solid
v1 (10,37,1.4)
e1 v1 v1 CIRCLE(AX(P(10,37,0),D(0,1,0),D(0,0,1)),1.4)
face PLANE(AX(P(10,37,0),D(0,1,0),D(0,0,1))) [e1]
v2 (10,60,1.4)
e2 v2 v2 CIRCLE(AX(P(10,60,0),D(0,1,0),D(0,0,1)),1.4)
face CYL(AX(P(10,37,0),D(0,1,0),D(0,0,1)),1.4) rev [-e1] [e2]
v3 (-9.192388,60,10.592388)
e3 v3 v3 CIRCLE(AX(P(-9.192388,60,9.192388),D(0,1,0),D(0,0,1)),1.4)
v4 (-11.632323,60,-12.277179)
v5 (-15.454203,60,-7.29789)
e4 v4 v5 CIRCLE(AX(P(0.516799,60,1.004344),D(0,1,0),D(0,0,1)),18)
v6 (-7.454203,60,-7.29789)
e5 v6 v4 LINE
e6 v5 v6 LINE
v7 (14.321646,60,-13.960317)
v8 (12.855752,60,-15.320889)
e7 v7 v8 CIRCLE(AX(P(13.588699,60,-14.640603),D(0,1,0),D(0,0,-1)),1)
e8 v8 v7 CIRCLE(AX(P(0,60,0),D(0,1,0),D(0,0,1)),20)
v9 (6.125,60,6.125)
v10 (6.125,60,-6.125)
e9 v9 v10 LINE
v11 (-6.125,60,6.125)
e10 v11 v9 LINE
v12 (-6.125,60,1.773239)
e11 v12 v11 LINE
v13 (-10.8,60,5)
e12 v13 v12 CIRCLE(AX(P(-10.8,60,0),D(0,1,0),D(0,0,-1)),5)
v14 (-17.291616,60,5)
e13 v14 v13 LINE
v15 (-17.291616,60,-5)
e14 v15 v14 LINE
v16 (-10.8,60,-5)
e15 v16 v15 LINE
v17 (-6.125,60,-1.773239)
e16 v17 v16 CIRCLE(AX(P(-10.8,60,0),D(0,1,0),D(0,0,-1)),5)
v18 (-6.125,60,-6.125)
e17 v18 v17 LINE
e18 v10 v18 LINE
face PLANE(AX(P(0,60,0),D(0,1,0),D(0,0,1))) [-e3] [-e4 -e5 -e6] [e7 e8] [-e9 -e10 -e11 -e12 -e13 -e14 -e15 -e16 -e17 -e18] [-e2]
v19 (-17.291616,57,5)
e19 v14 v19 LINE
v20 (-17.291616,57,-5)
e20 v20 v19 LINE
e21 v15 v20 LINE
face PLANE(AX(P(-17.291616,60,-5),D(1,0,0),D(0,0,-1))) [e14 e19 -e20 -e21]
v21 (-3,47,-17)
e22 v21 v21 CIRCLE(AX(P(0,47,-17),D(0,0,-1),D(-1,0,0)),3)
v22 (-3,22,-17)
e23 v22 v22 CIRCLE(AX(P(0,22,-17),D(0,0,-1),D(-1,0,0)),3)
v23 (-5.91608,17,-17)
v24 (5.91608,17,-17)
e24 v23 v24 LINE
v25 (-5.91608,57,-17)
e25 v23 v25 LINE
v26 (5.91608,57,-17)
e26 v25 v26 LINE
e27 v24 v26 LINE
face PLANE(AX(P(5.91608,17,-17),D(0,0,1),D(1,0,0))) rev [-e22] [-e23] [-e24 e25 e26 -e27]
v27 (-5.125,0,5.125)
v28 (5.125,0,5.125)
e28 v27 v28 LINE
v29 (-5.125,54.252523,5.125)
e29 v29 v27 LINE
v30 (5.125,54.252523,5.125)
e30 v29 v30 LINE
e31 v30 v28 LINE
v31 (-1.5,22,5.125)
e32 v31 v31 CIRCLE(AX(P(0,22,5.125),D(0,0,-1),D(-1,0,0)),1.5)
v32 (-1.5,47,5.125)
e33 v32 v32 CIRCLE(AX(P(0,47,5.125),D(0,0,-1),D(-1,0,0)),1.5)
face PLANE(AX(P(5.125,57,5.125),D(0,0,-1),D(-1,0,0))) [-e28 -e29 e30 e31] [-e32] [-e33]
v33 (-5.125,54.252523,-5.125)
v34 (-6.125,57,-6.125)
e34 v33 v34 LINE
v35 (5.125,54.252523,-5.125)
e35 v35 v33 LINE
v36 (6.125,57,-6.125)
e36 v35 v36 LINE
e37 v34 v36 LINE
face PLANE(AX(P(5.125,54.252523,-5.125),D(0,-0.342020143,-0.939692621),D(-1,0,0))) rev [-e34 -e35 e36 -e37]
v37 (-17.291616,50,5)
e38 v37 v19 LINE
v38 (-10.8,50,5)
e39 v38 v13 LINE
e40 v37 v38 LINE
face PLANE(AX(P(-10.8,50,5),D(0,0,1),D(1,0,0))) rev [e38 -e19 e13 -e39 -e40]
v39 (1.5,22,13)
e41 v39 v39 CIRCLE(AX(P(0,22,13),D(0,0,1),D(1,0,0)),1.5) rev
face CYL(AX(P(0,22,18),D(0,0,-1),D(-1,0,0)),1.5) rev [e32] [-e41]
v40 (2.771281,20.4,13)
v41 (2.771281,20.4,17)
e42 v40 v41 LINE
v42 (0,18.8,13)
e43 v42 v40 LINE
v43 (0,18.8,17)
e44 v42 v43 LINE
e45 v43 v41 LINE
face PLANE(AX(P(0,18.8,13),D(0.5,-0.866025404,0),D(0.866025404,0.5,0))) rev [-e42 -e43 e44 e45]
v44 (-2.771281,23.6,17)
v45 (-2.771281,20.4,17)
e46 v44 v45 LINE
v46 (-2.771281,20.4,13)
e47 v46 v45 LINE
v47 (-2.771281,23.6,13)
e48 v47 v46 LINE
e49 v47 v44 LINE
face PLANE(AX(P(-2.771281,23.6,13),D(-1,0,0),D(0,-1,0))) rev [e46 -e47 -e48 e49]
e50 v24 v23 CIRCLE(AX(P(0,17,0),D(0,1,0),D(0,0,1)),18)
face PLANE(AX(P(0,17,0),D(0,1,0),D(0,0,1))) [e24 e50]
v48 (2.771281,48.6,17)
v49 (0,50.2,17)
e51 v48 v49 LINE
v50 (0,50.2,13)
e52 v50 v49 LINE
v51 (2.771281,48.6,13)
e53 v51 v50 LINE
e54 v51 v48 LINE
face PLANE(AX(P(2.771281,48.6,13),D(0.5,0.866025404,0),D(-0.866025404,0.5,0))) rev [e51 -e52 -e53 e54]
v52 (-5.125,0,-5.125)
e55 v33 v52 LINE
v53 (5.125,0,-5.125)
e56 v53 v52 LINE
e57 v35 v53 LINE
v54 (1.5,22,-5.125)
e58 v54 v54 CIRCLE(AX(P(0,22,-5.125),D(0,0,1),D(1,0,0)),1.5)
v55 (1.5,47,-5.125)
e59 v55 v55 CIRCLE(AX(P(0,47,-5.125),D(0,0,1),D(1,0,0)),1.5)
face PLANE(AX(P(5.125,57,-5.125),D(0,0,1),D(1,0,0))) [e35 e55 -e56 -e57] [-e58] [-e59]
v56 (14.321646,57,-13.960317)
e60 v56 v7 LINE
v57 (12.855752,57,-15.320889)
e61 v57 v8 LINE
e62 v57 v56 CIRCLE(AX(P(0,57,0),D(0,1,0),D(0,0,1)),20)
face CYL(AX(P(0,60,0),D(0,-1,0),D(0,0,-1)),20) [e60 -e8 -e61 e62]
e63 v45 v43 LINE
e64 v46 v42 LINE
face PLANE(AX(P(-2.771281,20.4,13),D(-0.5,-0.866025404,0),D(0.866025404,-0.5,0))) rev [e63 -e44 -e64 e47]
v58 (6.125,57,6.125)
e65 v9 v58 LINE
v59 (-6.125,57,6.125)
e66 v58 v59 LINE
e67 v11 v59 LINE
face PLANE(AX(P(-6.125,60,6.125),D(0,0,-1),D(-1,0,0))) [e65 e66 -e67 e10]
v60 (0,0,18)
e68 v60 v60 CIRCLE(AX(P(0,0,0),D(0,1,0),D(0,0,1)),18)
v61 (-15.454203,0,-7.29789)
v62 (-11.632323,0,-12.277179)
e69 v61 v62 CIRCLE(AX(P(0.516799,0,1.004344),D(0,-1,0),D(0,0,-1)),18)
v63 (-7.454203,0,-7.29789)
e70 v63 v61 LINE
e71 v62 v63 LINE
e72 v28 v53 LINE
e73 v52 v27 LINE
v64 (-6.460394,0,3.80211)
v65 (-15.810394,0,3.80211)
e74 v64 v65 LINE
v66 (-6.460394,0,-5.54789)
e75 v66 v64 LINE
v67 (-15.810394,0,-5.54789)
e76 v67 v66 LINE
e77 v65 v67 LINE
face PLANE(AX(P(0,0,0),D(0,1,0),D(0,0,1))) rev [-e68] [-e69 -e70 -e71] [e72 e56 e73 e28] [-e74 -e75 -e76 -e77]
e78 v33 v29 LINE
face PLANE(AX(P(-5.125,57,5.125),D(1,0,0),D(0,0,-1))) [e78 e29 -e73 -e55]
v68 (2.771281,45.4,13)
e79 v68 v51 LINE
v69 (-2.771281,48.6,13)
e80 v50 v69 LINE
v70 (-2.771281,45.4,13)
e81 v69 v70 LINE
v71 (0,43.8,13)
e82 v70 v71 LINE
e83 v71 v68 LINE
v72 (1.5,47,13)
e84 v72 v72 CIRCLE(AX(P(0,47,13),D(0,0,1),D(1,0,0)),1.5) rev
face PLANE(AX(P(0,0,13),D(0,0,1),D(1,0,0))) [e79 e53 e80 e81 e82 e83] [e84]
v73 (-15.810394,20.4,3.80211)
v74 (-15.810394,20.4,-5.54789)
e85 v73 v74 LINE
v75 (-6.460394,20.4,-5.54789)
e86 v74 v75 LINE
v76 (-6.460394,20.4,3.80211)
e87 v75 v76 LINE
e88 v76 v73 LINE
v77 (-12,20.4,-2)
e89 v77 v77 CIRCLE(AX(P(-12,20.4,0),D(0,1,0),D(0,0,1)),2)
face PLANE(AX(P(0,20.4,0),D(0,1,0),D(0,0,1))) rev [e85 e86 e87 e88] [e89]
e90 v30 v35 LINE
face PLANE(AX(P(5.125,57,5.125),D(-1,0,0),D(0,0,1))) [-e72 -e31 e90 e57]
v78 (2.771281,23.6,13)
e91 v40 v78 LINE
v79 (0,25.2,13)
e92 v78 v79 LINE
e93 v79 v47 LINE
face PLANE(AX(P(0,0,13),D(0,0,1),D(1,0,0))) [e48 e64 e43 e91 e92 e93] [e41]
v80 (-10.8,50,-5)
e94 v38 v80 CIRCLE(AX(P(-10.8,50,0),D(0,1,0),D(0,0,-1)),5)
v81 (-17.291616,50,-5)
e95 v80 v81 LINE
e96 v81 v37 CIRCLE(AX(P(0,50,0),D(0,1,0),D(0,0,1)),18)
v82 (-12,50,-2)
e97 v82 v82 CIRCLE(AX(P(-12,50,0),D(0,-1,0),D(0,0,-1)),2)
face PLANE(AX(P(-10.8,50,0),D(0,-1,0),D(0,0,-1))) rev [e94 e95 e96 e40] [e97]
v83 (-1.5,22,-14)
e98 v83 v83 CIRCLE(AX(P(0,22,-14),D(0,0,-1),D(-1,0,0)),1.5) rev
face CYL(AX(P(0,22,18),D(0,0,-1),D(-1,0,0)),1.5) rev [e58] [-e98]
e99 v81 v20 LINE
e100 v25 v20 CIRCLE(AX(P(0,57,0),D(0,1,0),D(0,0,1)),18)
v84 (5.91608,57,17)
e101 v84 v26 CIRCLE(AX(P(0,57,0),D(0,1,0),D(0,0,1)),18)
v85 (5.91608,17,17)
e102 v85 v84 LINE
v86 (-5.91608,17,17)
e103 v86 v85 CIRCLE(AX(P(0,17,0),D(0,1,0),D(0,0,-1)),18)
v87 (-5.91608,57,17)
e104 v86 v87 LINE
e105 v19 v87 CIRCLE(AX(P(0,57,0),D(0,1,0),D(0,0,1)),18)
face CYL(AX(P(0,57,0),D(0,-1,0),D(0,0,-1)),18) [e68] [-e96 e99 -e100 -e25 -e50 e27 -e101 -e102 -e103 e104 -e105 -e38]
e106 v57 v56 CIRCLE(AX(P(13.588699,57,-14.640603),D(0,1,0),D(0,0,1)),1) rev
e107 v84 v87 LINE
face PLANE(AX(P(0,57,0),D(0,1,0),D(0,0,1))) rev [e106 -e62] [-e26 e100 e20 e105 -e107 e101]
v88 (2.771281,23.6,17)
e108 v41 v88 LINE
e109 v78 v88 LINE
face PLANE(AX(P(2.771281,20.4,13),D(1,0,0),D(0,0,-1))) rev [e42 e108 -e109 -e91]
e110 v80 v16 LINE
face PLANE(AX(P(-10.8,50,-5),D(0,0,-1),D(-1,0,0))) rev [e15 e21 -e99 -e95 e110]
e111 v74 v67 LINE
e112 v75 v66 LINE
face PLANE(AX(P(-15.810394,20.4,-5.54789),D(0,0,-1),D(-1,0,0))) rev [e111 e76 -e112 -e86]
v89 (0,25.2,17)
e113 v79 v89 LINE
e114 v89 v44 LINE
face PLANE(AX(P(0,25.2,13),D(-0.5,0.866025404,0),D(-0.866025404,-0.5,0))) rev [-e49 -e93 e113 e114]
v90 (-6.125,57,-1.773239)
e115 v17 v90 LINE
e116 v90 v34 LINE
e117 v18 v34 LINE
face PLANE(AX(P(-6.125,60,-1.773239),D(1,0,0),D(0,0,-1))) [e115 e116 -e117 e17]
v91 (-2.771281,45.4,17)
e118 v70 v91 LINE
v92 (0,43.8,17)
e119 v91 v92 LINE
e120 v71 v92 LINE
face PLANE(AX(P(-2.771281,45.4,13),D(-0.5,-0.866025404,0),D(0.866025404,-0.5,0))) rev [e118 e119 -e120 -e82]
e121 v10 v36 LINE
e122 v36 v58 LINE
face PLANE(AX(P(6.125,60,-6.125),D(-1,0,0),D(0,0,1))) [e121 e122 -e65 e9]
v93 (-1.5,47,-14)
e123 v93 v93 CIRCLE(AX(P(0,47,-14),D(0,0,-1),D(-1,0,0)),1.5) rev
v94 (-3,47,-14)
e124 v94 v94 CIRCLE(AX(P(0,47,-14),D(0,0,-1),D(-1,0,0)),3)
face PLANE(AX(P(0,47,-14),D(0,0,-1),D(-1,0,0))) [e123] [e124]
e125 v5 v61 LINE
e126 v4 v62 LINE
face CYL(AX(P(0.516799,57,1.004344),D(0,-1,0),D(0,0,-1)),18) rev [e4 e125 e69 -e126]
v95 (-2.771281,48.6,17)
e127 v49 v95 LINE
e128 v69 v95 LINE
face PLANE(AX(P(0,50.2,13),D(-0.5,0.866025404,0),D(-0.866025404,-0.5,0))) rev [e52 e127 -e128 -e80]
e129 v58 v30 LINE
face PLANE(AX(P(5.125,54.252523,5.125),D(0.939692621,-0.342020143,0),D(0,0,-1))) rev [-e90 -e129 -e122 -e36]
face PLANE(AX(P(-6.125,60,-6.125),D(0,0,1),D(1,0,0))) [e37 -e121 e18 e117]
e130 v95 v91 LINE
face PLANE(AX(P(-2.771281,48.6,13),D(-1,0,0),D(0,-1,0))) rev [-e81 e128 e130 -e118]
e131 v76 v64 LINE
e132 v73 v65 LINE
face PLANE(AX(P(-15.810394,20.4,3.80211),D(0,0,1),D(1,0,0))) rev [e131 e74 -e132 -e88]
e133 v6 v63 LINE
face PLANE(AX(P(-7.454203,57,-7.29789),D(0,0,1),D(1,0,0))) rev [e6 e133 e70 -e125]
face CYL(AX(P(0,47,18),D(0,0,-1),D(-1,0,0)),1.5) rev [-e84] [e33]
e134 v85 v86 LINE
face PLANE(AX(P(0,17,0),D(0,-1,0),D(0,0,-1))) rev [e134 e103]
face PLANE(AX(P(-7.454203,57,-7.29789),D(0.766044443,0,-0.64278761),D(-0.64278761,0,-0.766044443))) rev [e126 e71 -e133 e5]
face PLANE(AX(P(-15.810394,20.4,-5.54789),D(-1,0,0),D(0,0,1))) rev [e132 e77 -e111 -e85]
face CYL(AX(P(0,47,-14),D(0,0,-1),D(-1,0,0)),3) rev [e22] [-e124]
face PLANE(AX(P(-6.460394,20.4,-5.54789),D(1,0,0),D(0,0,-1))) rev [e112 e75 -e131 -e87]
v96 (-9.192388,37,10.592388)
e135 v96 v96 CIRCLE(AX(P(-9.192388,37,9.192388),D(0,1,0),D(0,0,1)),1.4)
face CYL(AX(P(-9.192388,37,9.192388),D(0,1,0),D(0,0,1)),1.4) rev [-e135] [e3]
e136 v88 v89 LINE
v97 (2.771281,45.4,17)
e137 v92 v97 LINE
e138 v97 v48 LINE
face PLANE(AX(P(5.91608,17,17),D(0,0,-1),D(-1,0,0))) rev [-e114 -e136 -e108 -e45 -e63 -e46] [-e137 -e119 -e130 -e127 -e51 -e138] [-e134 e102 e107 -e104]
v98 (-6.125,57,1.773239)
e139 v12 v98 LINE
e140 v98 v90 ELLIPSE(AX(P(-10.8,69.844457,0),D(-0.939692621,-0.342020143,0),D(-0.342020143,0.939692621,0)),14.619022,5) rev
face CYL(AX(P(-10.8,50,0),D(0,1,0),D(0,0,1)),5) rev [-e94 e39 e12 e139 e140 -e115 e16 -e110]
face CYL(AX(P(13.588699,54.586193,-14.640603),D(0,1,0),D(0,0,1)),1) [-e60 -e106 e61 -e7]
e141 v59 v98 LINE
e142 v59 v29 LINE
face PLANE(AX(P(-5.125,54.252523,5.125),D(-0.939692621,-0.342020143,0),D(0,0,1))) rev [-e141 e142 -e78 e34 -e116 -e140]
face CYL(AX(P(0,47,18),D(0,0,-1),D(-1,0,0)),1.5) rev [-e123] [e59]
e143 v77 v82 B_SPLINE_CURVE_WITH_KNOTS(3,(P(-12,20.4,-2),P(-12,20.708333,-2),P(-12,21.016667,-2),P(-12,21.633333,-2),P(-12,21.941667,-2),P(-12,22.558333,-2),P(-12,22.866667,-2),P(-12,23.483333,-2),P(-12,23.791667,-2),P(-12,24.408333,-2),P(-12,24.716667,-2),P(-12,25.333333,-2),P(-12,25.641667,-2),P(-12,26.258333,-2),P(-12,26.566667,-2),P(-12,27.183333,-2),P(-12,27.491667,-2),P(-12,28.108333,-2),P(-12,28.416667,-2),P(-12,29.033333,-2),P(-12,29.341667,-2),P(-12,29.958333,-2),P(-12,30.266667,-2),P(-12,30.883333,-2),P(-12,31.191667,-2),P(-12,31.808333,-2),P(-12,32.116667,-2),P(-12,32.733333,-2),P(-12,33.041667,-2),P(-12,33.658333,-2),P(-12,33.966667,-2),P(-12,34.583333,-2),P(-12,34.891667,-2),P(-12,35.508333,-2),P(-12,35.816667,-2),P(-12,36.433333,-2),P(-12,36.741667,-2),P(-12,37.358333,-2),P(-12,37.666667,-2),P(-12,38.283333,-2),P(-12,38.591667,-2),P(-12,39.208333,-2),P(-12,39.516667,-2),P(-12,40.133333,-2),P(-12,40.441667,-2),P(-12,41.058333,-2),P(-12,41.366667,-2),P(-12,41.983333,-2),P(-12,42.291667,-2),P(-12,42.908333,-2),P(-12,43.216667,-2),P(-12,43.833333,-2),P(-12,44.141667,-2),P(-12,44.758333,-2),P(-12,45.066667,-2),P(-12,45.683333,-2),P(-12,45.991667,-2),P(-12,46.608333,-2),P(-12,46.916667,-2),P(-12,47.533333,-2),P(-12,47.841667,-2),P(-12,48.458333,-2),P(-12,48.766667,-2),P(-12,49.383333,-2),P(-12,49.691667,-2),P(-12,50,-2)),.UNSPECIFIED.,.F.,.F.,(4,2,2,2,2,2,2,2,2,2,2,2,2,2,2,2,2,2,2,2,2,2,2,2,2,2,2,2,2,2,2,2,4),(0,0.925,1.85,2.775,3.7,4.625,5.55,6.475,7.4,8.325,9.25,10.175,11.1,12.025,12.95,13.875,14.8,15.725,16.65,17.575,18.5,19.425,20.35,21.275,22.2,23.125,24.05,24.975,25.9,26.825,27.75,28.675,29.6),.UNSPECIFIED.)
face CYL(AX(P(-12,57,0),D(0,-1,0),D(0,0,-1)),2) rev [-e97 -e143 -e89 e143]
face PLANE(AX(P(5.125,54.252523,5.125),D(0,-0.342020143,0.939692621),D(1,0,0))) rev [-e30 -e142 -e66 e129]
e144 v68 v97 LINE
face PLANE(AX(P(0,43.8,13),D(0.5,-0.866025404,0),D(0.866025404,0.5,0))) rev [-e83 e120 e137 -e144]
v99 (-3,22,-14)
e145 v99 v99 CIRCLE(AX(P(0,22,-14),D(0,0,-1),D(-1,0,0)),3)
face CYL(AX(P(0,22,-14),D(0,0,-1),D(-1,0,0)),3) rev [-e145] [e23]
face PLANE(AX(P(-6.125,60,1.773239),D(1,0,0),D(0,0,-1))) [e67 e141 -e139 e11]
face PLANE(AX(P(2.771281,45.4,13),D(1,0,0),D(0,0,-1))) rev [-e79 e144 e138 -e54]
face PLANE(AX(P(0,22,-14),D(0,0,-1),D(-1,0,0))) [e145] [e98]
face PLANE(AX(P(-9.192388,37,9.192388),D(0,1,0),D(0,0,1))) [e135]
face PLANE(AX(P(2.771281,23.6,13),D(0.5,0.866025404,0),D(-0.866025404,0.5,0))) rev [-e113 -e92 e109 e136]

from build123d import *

# Parameters (mm, degrees)
SKETCH1_R           = 18
SKETCH1_R_2         = 2
SKETCH1_W           = 10.25
SKETCH1_H           = 10.25
BOSS_EXTRUDE1_DEPTH = 57
CUT_EXTRUDE1_START  = -7
CUT_EXTRUDE1_DEPTH  = 7
SKETCH4_W           = 9.35
SKETCH4_H           = 9.35
CUT_EXTRUDE3_DEPTH  = 20.4
CUT_EXTRUDE4_START  = -40
CUT_EXTRUDE4_DEPTH  = 40
SKETCH6_R           = 1.5
CUT_EXTRUDE5_DEPTH  = 70.267597042
SKETCH7_R           = 3
CUT_EXTRUDE6_DEPTH  = 3
CUT_EXTRUDE7_DEPTH  = 4
CHAMFER1_SIZE       = 1
CHAMFER1_SIZE_2     = 2.747477419
CUT_EXTRUDE8_DEPTH  = 63.42595614
SKETCH12_R          = 1.4
CUT_EXTRUDE10_DEPTH = 20
SKETCH13_R          = 20
SKETCH13_R_2        = 1.4
BOSS_EXTRUDE2_DEPTH = 3
BOSS_EXTRUDE3_DEPTH = 3


with BuildPart() as part:
    # Sketch1 → Boss-Extrude1 (new body)
    with BuildSketch(Plane(origin=(0, 0, 0), x_dir=(1, 0, 0), z_dir=(0, 1, 0))):
        with Locations(Location((0, 0, 0), (0, 0, 90))):
            Circle(SKETCH1_R)
        with Locations(Location((-12, 0, 0), (0, 0, 90))):
            Circle(SKETCH1_R_2, mode=Mode.SUBTRACT)
        Rectangle(SKETCH1_W, SKETCH1_H, mode=Mode.SUBTRACT)
    extrude(amount=BOSS_EXTRUDE1_DEPTH)

    # Sketch2 → Cut-Extrude1 (cut)
    with BuildSketch(Plane(origin=(0, 57, 0), x_dir=(1, 0, 0), z_dir=(0, 1, 0)).offset(CUT_EXTRUDE1_START)):
        with BuildLine():
            Line((-10.8, 5), (-17.291616466, 5))
            ThreePointArc((-17.291616466, 5), (-18, 0), (-17.291616466, -5))
            Line((-17.291616466, -5), (-10.8, -5))
            ThreePointArc((-10.8, -5), (-5.8, 0), (-10.8, 5))
        make_face()
    extrude(amount=CUT_EXTRUDE1_DEPTH, mode=Mode.SUBTRACT)

    # Sketch4 → Cut-Extrude3 (cut)
    with BuildSketch(Plane(origin=(0, 0, 0), x_dir=(-1, 0, 0), z_dir=(0, -1, 0))):
        with Locations((11.135393506, 0.872889968)):
            Rectangle(SKETCH4_W, SKETCH4_H)
    extrude(amount=-CUT_EXTRUDE3_DEPTH, mode=Mode.SUBTRACT)

    # Sketch5 → Cut-Extrude4 (cut)
    with BuildSketch(Plane(origin=(0, 57, 0), x_dir=(1, 0, 0), z_dir=(0, 1, 0)).offset(CUT_EXTRUDE4_START)):
        with BuildLine():
            Line((5.916079783, 17), (-5.916079783, 17))
            ThreePointArc((-5.916079783, 17), (0, 18), (5.916079783, 17))
        make_face()
        with BuildLine():
            Line((5.916079783, -17), (-5.916079783, -17))
            ThreePointArc((-5.916079783, -17), (0, -18), (5.916079783, -17))
        make_face()
    extrude(amount=CUT_EXTRUDE4_DEPTH, mode=Mode.SUBTRACT)

    # Sketch6 → Cut-Extrude5 (cut, through all)
    with BuildSketch(Plane(origin=(0, 0, -17), x_dir=(-1, 0, 0), z_dir=(0, 0, -1))):
        with Locations((0, 47)):
            Circle(SKETCH6_R)
        with Locations((0, 22)):
            Circle(SKETCH6_R)
    extrude(amount=-CUT_EXTRUDE5_DEPTH, mode=Mode.SUBTRACT)

    # Sketch7 → Cut-Extrude6 (cut)
    with BuildSketch(Plane(origin=(0, 0, -17), x_dir=(-1, 0, 0), z_dir=(0, 0, -1))):
        with Locations((0, 47)):
            Circle(SKETCH7_R)
        with Locations((0, 22)):
            Circle(SKETCH7_R)
    extrude(amount=-CUT_EXTRUDE6_DEPTH, mode=Mode.SUBTRACT)

    # Sketch8 → Cut-Extrude7 (cut)
    with BuildSketch(Plane.XY.offset(17)):
        Polygon((0, 43.8), (2.771281292, 45.4), (2.771281292, 48.6), (0, 50.2), (-2.771281292, 48.6), (-2.771281292, 45.4), align=None)
        Polygon((0, 18.8), (2.771281292, 20.4), (2.771281292, 23.6), (0, 25.2), (-2.771281292, 23.6), (-2.771281292, 20.4), align=None)
    extrude(amount=-CUT_EXTRUDE7_DEPTH, mode=Mode.SUBTRACT)

    # Chamfer1
    # the kernel refuses this chamfer: 2.747477419, 1 mm, written as the material it takes off along each edge
    with BuildSketch(Plane(origin=(-5.125, 57, -5.125), x_dir=(0, 0.09904090225204956, -0.9950833631817488), z_dir=(1, 0, 0)), Plane(origin=(-5.125, 57, 5.125), x_dir=(-0.9950833631817488, 0.09904090225204956, 0), z_dir=(0, 0, -1)), Plane(origin=(5.125, 57, 5.125), x_dir=(0, 0.09904090225204956, 0.9950833631817488), z_dir=(-1, 0, 0)), Plane(origin=(5.125, 57, -5.125), x_dir=(0.9950833631817488, 0.09904090225204956, 0), z_dir=(0, 0, 1))) as chamfer1_piece_1:
        Polygon((CHAMFER1_SIZE * 0.995083363182, -CHAMFER1_SIZE * 0.099040902252), (-CHAMFER1_SIZE_2 * 0.0990409022684, -CHAMFER1_SIZE_2 * 0.995083363346), (0, 0), align=None)
    extrude(amount=10.25, mode=Mode.SUBTRACT)
    with BuildSketch(Plane(origin=(-5.125, 57, 5.125), x_dir=(-0.9950833631817488, 0.09904090225204956, 0), z_dir=(0, 0, -1))) as chamfer1_piece_2a_section:
        Polygon((CHAMFER1_SIZE * 0.995083363182, -CHAMFER1_SIZE * 0.099040902252), (-CHAMFER1_SIZE_2 * 0.0990409022684, -CHAMFER1_SIZE_2 * 0.995083363346), (0, 0), align=None)
    chamfer1_piece_2a = extrude(amount=17.377491449, mode=Mode.PRIVATE)
    chamfer1_piece_2a = split(chamfer1_piece_2a, bisect_by=Plane(origin=(-5.432505006, 56.059901151, -5.125), z_dir=(0, 0, -1)), keep=Keep.TOP, mode=Mode.PRIVATE)
    with BuildSketch(Plane(origin=(-12.252491449, 57, -5.125), x_dir=(0, 0.09904090225204956, -0.9950833631817488), z_dir=(1, 0, 0))) as chamfer1_piece_2b_section:
        Polygon((CHAMFER1_SIZE * 0.995083363182, -CHAMFER1_SIZE * 0.099040902252), (-CHAMFER1_SIZE_2 * 0.0990409022684, -CHAMFER1_SIZE_2 * 0.995083363346), (0, 0), align=None)
    chamfer1_piece_2b = extrude(amount=17.377491449, mode=Mode.PRIVATE)
    chamfer1_piece_2b = split(chamfer1_piece_2b, bisect_by=Plane(origin=(-5.125, 56.059901151, -5.432505006), z_dir=(-1, 0, 0)), keep=Keep.TOP, mode=Mode.PRIVATE)
    chamfer1_piece_2 = chamfer1_piece_2a & chamfer1_piece_2b
    add(chamfer1_piece_2, mode=Mode.SUBTRACT)
    with BuildSketch(Plane(origin=(5.125, 57, -12.252491449), x_dir=(0.9950833631817488, 0.09904090225204956, 0), z_dir=(0, 0, 1))) as chamfer1_piece_3a_section:
        Polygon((CHAMFER1_SIZE * 0.995083363182, -CHAMFER1_SIZE * 0.099040902252), (-CHAMFER1_SIZE_2 * 0.0990409022684, -CHAMFER1_SIZE_2 * 0.995083363346), (0, 0), align=None)
    chamfer1_piece_3a = extrude(amount=17.377491449, mode=Mode.PRIVATE)
    chamfer1_piece_3a = split(chamfer1_piece_3a, bisect_by=Plane(origin=(5.432505006, 56.059901151, -5.125), z_dir=(0, 0, -1)), keep=Keep.TOP, mode=Mode.PRIVATE)
    with BuildSketch(Plane(origin=(-5.125, 57, -5.125), x_dir=(0, 0.09904090225204956, -0.9950833631817488), z_dir=(1, 0, 0))) as chamfer1_piece_3b_section:
        Polygon((CHAMFER1_SIZE * 0.995083363182, -CHAMFER1_SIZE * 0.099040902252), (-CHAMFER1_SIZE_2 * 0.0990409022684, -CHAMFER1_SIZE_2 * 0.995083363346), (0, 0), align=None)
    chamfer1_piece_3b = extrude(amount=17.377491449, mode=Mode.PRIVATE)
    chamfer1_piece_3b = split(chamfer1_piece_3b, bisect_by=Plane(origin=(5.125, 56.059901151, -5.432505006), z_dir=(1, 0, 0)), keep=Keep.TOP, mode=Mode.PRIVATE)
    chamfer1_piece_3 = chamfer1_piece_3a & chamfer1_piece_3b
    add(chamfer1_piece_3, mode=Mode.SUBTRACT)
    with BuildSketch(Plane(origin=(5.125, 57, 5.125), x_dir=(0, 0.09904090225204956, 0.9950833631817488), z_dir=(-1, 0, 0))) as chamfer1_piece_4a_section:
        Polygon((CHAMFER1_SIZE * 0.995083363182, -CHAMFER1_SIZE * 0.099040902252), (-CHAMFER1_SIZE_2 * 0.0990409022684, -CHAMFER1_SIZE_2 * 0.995083363346), (0, 0), align=None)
    chamfer1_piece_4a = extrude(amount=17.377491449, mode=Mode.PRIVATE)
    chamfer1_piece_4a = split(chamfer1_piece_4a, bisect_by=Plane(origin=(-5.125, 56.059901151, 5.432505006), z_dir=(-1, 0, 0)), keep=Keep.TOP, mode=Mode.PRIVATE)
    with BuildSketch(Plane(origin=(-5.125, 57, 12.252491449), x_dir=(-0.9950833631817488, 0.09904090225204956, 0), z_dir=(0, 0, -1))) as chamfer1_piece_4b_section:
        Polygon((CHAMFER1_SIZE * 0.995083363182, -CHAMFER1_SIZE * 0.099040902252), (-CHAMFER1_SIZE_2 * 0.0990409022684, -CHAMFER1_SIZE_2 * 0.995083363346), (0, 0), align=None)
    chamfer1_piece_4b = extrude(amount=17.377491449, mode=Mode.PRIVATE)
    chamfer1_piece_4b = split(chamfer1_piece_4b, bisect_by=Plane(origin=(-5.432505006, 56.059901151, 5.125), z_dir=(0, 0, 1)), keep=Keep.TOP, mode=Mode.PRIVATE)
    chamfer1_piece_4 = chamfer1_piece_4a & chamfer1_piece_4b
    add(chamfer1_piece_4, mode=Mode.SUBTRACT)
    with BuildSketch(Plane(origin=(12.252491449, 57, 5.125), x_dir=(0, 0.09904090225204956, 0.9950833631817488), z_dir=(-1, 0, 0))) as chamfer1_piece_5a_section:
        Polygon((CHAMFER1_SIZE * 0.995083363182, -CHAMFER1_SIZE * 0.099040902252), (-CHAMFER1_SIZE_2 * 0.0990409022684, -CHAMFER1_SIZE_2 * 0.995083363346), (0, 0), align=None)
    chamfer1_piece_5a = extrude(amount=17.377491449, mode=Mode.PRIVATE)
    chamfer1_piece_5a = split(chamfer1_piece_5a, bisect_by=Plane(origin=(5.125, 56.059901151, 5.432505006), z_dir=(1, 0, 0)), keep=Keep.TOP, mode=Mode.PRIVATE)
    with BuildSketch(Plane(origin=(5.125, 57, -5.125), x_dir=(0.9950833631817488, 0.09904090225204956, 0), z_dir=(0, 0, 1))) as chamfer1_piece_5b_section:
        Polygon((CHAMFER1_SIZE * 0.995083363182, -CHAMFER1_SIZE * 0.099040902252), (-CHAMFER1_SIZE_2 * 0.0990409022684, -CHAMFER1_SIZE_2 * 0.995083363346), (0, 0), align=None)
    chamfer1_piece_5b = extrude(amount=17.377491449, mode=Mode.PRIVATE)
    chamfer1_piece_5b = split(chamfer1_piece_5b, bisect_by=Plane(origin=(5.432505006, 56.059901151, 5.125), z_dir=(0, 0, 1)), keep=Keep.TOP, mode=Mode.PRIVATE)
    chamfer1_piece_5 = chamfer1_piece_5a & chamfer1_piece_5b
    add(chamfer1_piece_5, mode=Mode.SUBTRACT)

    # Sketch9 → Cut-Extrude8 (cut, through all)
    with BuildSketch(Plane.XZ):
        with BuildLine():
            Line((-7.454203172, -7.297889968), (-15.454203172, -7.297889968))
            ThreePointArc((-15.454203172, -7.297889968), (-13.761984914, -9.955415688), (-11.632322635, -12.277178848))
            Line((-11.632322635, -12.277178848), (-7.454203172, -7.297889968))
        make_face()
    extrude(amount=-CUT_EXTRUDE8_DEPTH, mode=Mode.SUBTRACT)

    # Sketch12 → Cut-Extrude10 (cut)
    with BuildSketch(Plane(origin=(0, 57, 0), x_dir=(1, 0, 0), z_dir=(0, 1, 0))):
        with Locations(Location((10, 0, 0), (0, 0, 270))):
            Circle(SKETCH12_R)
        with Locations(Location((-9.192388155, -9.192388155, 0), (0, 0, 270))):
            Circle(SKETCH12_R)
    extrude(amount=-CUT_EXTRUDE10_DEPTH, mode=Mode.SUBTRACT)

    # Sketch13 → Boss-Extrude2 (add)
    with BuildSketch(Plane(origin=(0, 57, 0), x_dir=(1, 0, 0), z_dir=(0, 1, 0))):
        with Locations(Location((0, 0, 0), (0, 0, 270))):
            Circle(SKETCH13_R)
        with Locations(Location((10, 0, 0), (0, 0, 270))):
            Circle(SKETCH13_R_2, mode=Mode.SUBTRACT)
        with Locations(Location((-9.192388155, -9.192388155, 0), (0, 0, 270))):
            Circle(SKETCH13_R_2, mode=Mode.SUBTRACT)
        with BuildLine():
            Line((-10.8, 5), (-17.291616466, 5))
            Line((-17.291616466, 5), (-17.291616466, -5))
            Line((-17.291616466, -5), (-10.8, -5))
            ThreePointArc((-10.8, -5), (-7.959770503, -4.114984375), (-6.125, -1.773238563))
            Line((-6.125, -1.773238563), (-6.125, -6.125))
            Line((-6.125, -6.125), (6.125, -6.125))
            Line((6.125, -6.125), (6.125, 6.125))
            Line((6.125, 6.125), (-6.125, 6.125))
            Line((-6.125, 6.125), (-6.125, 1.773238563))
            ThreePointArc((-6.125, 1.773238563), (-7.959770503, 4.114984375), (-10.8, 5))
        make_face(mode=Mode.SUBTRACT)
        with BuildLine():
            Line((-7.454203172, 7.297889968), (-15.454203172, 7.297889968))
            ThreePointArc((-15.454203172, 7.297889968), (-13.761984914, 9.955415688), (-11.632322635, 12.277178848))
            Line((-11.632322635, 12.277178848), (-7.454203172, 7.297889968))
        make_face(mode=Mode.SUBTRACT)
    extrude(amount=BOSS_EXTRUDE2_DEPTH)

    # Sketch14 → Boss-Extrude3 (add)
    with BuildSketch(Plane(origin=(0, 60, 0), x_dir=(1, 0, 0), z_dir=(0, 1, 0))):
        with BuildLine():
            Line((12.855752194, 15.320888862), (14.321646009, 13.960317173))
            ThreePointArc((14.321646009, 13.960317173), (14.268984946, 15.373549926), (12.855752194, 15.320888862))
        make_face()
    extrude(amount=-BOSS_EXTRUDE3_DEPTH)


solid = part.part
